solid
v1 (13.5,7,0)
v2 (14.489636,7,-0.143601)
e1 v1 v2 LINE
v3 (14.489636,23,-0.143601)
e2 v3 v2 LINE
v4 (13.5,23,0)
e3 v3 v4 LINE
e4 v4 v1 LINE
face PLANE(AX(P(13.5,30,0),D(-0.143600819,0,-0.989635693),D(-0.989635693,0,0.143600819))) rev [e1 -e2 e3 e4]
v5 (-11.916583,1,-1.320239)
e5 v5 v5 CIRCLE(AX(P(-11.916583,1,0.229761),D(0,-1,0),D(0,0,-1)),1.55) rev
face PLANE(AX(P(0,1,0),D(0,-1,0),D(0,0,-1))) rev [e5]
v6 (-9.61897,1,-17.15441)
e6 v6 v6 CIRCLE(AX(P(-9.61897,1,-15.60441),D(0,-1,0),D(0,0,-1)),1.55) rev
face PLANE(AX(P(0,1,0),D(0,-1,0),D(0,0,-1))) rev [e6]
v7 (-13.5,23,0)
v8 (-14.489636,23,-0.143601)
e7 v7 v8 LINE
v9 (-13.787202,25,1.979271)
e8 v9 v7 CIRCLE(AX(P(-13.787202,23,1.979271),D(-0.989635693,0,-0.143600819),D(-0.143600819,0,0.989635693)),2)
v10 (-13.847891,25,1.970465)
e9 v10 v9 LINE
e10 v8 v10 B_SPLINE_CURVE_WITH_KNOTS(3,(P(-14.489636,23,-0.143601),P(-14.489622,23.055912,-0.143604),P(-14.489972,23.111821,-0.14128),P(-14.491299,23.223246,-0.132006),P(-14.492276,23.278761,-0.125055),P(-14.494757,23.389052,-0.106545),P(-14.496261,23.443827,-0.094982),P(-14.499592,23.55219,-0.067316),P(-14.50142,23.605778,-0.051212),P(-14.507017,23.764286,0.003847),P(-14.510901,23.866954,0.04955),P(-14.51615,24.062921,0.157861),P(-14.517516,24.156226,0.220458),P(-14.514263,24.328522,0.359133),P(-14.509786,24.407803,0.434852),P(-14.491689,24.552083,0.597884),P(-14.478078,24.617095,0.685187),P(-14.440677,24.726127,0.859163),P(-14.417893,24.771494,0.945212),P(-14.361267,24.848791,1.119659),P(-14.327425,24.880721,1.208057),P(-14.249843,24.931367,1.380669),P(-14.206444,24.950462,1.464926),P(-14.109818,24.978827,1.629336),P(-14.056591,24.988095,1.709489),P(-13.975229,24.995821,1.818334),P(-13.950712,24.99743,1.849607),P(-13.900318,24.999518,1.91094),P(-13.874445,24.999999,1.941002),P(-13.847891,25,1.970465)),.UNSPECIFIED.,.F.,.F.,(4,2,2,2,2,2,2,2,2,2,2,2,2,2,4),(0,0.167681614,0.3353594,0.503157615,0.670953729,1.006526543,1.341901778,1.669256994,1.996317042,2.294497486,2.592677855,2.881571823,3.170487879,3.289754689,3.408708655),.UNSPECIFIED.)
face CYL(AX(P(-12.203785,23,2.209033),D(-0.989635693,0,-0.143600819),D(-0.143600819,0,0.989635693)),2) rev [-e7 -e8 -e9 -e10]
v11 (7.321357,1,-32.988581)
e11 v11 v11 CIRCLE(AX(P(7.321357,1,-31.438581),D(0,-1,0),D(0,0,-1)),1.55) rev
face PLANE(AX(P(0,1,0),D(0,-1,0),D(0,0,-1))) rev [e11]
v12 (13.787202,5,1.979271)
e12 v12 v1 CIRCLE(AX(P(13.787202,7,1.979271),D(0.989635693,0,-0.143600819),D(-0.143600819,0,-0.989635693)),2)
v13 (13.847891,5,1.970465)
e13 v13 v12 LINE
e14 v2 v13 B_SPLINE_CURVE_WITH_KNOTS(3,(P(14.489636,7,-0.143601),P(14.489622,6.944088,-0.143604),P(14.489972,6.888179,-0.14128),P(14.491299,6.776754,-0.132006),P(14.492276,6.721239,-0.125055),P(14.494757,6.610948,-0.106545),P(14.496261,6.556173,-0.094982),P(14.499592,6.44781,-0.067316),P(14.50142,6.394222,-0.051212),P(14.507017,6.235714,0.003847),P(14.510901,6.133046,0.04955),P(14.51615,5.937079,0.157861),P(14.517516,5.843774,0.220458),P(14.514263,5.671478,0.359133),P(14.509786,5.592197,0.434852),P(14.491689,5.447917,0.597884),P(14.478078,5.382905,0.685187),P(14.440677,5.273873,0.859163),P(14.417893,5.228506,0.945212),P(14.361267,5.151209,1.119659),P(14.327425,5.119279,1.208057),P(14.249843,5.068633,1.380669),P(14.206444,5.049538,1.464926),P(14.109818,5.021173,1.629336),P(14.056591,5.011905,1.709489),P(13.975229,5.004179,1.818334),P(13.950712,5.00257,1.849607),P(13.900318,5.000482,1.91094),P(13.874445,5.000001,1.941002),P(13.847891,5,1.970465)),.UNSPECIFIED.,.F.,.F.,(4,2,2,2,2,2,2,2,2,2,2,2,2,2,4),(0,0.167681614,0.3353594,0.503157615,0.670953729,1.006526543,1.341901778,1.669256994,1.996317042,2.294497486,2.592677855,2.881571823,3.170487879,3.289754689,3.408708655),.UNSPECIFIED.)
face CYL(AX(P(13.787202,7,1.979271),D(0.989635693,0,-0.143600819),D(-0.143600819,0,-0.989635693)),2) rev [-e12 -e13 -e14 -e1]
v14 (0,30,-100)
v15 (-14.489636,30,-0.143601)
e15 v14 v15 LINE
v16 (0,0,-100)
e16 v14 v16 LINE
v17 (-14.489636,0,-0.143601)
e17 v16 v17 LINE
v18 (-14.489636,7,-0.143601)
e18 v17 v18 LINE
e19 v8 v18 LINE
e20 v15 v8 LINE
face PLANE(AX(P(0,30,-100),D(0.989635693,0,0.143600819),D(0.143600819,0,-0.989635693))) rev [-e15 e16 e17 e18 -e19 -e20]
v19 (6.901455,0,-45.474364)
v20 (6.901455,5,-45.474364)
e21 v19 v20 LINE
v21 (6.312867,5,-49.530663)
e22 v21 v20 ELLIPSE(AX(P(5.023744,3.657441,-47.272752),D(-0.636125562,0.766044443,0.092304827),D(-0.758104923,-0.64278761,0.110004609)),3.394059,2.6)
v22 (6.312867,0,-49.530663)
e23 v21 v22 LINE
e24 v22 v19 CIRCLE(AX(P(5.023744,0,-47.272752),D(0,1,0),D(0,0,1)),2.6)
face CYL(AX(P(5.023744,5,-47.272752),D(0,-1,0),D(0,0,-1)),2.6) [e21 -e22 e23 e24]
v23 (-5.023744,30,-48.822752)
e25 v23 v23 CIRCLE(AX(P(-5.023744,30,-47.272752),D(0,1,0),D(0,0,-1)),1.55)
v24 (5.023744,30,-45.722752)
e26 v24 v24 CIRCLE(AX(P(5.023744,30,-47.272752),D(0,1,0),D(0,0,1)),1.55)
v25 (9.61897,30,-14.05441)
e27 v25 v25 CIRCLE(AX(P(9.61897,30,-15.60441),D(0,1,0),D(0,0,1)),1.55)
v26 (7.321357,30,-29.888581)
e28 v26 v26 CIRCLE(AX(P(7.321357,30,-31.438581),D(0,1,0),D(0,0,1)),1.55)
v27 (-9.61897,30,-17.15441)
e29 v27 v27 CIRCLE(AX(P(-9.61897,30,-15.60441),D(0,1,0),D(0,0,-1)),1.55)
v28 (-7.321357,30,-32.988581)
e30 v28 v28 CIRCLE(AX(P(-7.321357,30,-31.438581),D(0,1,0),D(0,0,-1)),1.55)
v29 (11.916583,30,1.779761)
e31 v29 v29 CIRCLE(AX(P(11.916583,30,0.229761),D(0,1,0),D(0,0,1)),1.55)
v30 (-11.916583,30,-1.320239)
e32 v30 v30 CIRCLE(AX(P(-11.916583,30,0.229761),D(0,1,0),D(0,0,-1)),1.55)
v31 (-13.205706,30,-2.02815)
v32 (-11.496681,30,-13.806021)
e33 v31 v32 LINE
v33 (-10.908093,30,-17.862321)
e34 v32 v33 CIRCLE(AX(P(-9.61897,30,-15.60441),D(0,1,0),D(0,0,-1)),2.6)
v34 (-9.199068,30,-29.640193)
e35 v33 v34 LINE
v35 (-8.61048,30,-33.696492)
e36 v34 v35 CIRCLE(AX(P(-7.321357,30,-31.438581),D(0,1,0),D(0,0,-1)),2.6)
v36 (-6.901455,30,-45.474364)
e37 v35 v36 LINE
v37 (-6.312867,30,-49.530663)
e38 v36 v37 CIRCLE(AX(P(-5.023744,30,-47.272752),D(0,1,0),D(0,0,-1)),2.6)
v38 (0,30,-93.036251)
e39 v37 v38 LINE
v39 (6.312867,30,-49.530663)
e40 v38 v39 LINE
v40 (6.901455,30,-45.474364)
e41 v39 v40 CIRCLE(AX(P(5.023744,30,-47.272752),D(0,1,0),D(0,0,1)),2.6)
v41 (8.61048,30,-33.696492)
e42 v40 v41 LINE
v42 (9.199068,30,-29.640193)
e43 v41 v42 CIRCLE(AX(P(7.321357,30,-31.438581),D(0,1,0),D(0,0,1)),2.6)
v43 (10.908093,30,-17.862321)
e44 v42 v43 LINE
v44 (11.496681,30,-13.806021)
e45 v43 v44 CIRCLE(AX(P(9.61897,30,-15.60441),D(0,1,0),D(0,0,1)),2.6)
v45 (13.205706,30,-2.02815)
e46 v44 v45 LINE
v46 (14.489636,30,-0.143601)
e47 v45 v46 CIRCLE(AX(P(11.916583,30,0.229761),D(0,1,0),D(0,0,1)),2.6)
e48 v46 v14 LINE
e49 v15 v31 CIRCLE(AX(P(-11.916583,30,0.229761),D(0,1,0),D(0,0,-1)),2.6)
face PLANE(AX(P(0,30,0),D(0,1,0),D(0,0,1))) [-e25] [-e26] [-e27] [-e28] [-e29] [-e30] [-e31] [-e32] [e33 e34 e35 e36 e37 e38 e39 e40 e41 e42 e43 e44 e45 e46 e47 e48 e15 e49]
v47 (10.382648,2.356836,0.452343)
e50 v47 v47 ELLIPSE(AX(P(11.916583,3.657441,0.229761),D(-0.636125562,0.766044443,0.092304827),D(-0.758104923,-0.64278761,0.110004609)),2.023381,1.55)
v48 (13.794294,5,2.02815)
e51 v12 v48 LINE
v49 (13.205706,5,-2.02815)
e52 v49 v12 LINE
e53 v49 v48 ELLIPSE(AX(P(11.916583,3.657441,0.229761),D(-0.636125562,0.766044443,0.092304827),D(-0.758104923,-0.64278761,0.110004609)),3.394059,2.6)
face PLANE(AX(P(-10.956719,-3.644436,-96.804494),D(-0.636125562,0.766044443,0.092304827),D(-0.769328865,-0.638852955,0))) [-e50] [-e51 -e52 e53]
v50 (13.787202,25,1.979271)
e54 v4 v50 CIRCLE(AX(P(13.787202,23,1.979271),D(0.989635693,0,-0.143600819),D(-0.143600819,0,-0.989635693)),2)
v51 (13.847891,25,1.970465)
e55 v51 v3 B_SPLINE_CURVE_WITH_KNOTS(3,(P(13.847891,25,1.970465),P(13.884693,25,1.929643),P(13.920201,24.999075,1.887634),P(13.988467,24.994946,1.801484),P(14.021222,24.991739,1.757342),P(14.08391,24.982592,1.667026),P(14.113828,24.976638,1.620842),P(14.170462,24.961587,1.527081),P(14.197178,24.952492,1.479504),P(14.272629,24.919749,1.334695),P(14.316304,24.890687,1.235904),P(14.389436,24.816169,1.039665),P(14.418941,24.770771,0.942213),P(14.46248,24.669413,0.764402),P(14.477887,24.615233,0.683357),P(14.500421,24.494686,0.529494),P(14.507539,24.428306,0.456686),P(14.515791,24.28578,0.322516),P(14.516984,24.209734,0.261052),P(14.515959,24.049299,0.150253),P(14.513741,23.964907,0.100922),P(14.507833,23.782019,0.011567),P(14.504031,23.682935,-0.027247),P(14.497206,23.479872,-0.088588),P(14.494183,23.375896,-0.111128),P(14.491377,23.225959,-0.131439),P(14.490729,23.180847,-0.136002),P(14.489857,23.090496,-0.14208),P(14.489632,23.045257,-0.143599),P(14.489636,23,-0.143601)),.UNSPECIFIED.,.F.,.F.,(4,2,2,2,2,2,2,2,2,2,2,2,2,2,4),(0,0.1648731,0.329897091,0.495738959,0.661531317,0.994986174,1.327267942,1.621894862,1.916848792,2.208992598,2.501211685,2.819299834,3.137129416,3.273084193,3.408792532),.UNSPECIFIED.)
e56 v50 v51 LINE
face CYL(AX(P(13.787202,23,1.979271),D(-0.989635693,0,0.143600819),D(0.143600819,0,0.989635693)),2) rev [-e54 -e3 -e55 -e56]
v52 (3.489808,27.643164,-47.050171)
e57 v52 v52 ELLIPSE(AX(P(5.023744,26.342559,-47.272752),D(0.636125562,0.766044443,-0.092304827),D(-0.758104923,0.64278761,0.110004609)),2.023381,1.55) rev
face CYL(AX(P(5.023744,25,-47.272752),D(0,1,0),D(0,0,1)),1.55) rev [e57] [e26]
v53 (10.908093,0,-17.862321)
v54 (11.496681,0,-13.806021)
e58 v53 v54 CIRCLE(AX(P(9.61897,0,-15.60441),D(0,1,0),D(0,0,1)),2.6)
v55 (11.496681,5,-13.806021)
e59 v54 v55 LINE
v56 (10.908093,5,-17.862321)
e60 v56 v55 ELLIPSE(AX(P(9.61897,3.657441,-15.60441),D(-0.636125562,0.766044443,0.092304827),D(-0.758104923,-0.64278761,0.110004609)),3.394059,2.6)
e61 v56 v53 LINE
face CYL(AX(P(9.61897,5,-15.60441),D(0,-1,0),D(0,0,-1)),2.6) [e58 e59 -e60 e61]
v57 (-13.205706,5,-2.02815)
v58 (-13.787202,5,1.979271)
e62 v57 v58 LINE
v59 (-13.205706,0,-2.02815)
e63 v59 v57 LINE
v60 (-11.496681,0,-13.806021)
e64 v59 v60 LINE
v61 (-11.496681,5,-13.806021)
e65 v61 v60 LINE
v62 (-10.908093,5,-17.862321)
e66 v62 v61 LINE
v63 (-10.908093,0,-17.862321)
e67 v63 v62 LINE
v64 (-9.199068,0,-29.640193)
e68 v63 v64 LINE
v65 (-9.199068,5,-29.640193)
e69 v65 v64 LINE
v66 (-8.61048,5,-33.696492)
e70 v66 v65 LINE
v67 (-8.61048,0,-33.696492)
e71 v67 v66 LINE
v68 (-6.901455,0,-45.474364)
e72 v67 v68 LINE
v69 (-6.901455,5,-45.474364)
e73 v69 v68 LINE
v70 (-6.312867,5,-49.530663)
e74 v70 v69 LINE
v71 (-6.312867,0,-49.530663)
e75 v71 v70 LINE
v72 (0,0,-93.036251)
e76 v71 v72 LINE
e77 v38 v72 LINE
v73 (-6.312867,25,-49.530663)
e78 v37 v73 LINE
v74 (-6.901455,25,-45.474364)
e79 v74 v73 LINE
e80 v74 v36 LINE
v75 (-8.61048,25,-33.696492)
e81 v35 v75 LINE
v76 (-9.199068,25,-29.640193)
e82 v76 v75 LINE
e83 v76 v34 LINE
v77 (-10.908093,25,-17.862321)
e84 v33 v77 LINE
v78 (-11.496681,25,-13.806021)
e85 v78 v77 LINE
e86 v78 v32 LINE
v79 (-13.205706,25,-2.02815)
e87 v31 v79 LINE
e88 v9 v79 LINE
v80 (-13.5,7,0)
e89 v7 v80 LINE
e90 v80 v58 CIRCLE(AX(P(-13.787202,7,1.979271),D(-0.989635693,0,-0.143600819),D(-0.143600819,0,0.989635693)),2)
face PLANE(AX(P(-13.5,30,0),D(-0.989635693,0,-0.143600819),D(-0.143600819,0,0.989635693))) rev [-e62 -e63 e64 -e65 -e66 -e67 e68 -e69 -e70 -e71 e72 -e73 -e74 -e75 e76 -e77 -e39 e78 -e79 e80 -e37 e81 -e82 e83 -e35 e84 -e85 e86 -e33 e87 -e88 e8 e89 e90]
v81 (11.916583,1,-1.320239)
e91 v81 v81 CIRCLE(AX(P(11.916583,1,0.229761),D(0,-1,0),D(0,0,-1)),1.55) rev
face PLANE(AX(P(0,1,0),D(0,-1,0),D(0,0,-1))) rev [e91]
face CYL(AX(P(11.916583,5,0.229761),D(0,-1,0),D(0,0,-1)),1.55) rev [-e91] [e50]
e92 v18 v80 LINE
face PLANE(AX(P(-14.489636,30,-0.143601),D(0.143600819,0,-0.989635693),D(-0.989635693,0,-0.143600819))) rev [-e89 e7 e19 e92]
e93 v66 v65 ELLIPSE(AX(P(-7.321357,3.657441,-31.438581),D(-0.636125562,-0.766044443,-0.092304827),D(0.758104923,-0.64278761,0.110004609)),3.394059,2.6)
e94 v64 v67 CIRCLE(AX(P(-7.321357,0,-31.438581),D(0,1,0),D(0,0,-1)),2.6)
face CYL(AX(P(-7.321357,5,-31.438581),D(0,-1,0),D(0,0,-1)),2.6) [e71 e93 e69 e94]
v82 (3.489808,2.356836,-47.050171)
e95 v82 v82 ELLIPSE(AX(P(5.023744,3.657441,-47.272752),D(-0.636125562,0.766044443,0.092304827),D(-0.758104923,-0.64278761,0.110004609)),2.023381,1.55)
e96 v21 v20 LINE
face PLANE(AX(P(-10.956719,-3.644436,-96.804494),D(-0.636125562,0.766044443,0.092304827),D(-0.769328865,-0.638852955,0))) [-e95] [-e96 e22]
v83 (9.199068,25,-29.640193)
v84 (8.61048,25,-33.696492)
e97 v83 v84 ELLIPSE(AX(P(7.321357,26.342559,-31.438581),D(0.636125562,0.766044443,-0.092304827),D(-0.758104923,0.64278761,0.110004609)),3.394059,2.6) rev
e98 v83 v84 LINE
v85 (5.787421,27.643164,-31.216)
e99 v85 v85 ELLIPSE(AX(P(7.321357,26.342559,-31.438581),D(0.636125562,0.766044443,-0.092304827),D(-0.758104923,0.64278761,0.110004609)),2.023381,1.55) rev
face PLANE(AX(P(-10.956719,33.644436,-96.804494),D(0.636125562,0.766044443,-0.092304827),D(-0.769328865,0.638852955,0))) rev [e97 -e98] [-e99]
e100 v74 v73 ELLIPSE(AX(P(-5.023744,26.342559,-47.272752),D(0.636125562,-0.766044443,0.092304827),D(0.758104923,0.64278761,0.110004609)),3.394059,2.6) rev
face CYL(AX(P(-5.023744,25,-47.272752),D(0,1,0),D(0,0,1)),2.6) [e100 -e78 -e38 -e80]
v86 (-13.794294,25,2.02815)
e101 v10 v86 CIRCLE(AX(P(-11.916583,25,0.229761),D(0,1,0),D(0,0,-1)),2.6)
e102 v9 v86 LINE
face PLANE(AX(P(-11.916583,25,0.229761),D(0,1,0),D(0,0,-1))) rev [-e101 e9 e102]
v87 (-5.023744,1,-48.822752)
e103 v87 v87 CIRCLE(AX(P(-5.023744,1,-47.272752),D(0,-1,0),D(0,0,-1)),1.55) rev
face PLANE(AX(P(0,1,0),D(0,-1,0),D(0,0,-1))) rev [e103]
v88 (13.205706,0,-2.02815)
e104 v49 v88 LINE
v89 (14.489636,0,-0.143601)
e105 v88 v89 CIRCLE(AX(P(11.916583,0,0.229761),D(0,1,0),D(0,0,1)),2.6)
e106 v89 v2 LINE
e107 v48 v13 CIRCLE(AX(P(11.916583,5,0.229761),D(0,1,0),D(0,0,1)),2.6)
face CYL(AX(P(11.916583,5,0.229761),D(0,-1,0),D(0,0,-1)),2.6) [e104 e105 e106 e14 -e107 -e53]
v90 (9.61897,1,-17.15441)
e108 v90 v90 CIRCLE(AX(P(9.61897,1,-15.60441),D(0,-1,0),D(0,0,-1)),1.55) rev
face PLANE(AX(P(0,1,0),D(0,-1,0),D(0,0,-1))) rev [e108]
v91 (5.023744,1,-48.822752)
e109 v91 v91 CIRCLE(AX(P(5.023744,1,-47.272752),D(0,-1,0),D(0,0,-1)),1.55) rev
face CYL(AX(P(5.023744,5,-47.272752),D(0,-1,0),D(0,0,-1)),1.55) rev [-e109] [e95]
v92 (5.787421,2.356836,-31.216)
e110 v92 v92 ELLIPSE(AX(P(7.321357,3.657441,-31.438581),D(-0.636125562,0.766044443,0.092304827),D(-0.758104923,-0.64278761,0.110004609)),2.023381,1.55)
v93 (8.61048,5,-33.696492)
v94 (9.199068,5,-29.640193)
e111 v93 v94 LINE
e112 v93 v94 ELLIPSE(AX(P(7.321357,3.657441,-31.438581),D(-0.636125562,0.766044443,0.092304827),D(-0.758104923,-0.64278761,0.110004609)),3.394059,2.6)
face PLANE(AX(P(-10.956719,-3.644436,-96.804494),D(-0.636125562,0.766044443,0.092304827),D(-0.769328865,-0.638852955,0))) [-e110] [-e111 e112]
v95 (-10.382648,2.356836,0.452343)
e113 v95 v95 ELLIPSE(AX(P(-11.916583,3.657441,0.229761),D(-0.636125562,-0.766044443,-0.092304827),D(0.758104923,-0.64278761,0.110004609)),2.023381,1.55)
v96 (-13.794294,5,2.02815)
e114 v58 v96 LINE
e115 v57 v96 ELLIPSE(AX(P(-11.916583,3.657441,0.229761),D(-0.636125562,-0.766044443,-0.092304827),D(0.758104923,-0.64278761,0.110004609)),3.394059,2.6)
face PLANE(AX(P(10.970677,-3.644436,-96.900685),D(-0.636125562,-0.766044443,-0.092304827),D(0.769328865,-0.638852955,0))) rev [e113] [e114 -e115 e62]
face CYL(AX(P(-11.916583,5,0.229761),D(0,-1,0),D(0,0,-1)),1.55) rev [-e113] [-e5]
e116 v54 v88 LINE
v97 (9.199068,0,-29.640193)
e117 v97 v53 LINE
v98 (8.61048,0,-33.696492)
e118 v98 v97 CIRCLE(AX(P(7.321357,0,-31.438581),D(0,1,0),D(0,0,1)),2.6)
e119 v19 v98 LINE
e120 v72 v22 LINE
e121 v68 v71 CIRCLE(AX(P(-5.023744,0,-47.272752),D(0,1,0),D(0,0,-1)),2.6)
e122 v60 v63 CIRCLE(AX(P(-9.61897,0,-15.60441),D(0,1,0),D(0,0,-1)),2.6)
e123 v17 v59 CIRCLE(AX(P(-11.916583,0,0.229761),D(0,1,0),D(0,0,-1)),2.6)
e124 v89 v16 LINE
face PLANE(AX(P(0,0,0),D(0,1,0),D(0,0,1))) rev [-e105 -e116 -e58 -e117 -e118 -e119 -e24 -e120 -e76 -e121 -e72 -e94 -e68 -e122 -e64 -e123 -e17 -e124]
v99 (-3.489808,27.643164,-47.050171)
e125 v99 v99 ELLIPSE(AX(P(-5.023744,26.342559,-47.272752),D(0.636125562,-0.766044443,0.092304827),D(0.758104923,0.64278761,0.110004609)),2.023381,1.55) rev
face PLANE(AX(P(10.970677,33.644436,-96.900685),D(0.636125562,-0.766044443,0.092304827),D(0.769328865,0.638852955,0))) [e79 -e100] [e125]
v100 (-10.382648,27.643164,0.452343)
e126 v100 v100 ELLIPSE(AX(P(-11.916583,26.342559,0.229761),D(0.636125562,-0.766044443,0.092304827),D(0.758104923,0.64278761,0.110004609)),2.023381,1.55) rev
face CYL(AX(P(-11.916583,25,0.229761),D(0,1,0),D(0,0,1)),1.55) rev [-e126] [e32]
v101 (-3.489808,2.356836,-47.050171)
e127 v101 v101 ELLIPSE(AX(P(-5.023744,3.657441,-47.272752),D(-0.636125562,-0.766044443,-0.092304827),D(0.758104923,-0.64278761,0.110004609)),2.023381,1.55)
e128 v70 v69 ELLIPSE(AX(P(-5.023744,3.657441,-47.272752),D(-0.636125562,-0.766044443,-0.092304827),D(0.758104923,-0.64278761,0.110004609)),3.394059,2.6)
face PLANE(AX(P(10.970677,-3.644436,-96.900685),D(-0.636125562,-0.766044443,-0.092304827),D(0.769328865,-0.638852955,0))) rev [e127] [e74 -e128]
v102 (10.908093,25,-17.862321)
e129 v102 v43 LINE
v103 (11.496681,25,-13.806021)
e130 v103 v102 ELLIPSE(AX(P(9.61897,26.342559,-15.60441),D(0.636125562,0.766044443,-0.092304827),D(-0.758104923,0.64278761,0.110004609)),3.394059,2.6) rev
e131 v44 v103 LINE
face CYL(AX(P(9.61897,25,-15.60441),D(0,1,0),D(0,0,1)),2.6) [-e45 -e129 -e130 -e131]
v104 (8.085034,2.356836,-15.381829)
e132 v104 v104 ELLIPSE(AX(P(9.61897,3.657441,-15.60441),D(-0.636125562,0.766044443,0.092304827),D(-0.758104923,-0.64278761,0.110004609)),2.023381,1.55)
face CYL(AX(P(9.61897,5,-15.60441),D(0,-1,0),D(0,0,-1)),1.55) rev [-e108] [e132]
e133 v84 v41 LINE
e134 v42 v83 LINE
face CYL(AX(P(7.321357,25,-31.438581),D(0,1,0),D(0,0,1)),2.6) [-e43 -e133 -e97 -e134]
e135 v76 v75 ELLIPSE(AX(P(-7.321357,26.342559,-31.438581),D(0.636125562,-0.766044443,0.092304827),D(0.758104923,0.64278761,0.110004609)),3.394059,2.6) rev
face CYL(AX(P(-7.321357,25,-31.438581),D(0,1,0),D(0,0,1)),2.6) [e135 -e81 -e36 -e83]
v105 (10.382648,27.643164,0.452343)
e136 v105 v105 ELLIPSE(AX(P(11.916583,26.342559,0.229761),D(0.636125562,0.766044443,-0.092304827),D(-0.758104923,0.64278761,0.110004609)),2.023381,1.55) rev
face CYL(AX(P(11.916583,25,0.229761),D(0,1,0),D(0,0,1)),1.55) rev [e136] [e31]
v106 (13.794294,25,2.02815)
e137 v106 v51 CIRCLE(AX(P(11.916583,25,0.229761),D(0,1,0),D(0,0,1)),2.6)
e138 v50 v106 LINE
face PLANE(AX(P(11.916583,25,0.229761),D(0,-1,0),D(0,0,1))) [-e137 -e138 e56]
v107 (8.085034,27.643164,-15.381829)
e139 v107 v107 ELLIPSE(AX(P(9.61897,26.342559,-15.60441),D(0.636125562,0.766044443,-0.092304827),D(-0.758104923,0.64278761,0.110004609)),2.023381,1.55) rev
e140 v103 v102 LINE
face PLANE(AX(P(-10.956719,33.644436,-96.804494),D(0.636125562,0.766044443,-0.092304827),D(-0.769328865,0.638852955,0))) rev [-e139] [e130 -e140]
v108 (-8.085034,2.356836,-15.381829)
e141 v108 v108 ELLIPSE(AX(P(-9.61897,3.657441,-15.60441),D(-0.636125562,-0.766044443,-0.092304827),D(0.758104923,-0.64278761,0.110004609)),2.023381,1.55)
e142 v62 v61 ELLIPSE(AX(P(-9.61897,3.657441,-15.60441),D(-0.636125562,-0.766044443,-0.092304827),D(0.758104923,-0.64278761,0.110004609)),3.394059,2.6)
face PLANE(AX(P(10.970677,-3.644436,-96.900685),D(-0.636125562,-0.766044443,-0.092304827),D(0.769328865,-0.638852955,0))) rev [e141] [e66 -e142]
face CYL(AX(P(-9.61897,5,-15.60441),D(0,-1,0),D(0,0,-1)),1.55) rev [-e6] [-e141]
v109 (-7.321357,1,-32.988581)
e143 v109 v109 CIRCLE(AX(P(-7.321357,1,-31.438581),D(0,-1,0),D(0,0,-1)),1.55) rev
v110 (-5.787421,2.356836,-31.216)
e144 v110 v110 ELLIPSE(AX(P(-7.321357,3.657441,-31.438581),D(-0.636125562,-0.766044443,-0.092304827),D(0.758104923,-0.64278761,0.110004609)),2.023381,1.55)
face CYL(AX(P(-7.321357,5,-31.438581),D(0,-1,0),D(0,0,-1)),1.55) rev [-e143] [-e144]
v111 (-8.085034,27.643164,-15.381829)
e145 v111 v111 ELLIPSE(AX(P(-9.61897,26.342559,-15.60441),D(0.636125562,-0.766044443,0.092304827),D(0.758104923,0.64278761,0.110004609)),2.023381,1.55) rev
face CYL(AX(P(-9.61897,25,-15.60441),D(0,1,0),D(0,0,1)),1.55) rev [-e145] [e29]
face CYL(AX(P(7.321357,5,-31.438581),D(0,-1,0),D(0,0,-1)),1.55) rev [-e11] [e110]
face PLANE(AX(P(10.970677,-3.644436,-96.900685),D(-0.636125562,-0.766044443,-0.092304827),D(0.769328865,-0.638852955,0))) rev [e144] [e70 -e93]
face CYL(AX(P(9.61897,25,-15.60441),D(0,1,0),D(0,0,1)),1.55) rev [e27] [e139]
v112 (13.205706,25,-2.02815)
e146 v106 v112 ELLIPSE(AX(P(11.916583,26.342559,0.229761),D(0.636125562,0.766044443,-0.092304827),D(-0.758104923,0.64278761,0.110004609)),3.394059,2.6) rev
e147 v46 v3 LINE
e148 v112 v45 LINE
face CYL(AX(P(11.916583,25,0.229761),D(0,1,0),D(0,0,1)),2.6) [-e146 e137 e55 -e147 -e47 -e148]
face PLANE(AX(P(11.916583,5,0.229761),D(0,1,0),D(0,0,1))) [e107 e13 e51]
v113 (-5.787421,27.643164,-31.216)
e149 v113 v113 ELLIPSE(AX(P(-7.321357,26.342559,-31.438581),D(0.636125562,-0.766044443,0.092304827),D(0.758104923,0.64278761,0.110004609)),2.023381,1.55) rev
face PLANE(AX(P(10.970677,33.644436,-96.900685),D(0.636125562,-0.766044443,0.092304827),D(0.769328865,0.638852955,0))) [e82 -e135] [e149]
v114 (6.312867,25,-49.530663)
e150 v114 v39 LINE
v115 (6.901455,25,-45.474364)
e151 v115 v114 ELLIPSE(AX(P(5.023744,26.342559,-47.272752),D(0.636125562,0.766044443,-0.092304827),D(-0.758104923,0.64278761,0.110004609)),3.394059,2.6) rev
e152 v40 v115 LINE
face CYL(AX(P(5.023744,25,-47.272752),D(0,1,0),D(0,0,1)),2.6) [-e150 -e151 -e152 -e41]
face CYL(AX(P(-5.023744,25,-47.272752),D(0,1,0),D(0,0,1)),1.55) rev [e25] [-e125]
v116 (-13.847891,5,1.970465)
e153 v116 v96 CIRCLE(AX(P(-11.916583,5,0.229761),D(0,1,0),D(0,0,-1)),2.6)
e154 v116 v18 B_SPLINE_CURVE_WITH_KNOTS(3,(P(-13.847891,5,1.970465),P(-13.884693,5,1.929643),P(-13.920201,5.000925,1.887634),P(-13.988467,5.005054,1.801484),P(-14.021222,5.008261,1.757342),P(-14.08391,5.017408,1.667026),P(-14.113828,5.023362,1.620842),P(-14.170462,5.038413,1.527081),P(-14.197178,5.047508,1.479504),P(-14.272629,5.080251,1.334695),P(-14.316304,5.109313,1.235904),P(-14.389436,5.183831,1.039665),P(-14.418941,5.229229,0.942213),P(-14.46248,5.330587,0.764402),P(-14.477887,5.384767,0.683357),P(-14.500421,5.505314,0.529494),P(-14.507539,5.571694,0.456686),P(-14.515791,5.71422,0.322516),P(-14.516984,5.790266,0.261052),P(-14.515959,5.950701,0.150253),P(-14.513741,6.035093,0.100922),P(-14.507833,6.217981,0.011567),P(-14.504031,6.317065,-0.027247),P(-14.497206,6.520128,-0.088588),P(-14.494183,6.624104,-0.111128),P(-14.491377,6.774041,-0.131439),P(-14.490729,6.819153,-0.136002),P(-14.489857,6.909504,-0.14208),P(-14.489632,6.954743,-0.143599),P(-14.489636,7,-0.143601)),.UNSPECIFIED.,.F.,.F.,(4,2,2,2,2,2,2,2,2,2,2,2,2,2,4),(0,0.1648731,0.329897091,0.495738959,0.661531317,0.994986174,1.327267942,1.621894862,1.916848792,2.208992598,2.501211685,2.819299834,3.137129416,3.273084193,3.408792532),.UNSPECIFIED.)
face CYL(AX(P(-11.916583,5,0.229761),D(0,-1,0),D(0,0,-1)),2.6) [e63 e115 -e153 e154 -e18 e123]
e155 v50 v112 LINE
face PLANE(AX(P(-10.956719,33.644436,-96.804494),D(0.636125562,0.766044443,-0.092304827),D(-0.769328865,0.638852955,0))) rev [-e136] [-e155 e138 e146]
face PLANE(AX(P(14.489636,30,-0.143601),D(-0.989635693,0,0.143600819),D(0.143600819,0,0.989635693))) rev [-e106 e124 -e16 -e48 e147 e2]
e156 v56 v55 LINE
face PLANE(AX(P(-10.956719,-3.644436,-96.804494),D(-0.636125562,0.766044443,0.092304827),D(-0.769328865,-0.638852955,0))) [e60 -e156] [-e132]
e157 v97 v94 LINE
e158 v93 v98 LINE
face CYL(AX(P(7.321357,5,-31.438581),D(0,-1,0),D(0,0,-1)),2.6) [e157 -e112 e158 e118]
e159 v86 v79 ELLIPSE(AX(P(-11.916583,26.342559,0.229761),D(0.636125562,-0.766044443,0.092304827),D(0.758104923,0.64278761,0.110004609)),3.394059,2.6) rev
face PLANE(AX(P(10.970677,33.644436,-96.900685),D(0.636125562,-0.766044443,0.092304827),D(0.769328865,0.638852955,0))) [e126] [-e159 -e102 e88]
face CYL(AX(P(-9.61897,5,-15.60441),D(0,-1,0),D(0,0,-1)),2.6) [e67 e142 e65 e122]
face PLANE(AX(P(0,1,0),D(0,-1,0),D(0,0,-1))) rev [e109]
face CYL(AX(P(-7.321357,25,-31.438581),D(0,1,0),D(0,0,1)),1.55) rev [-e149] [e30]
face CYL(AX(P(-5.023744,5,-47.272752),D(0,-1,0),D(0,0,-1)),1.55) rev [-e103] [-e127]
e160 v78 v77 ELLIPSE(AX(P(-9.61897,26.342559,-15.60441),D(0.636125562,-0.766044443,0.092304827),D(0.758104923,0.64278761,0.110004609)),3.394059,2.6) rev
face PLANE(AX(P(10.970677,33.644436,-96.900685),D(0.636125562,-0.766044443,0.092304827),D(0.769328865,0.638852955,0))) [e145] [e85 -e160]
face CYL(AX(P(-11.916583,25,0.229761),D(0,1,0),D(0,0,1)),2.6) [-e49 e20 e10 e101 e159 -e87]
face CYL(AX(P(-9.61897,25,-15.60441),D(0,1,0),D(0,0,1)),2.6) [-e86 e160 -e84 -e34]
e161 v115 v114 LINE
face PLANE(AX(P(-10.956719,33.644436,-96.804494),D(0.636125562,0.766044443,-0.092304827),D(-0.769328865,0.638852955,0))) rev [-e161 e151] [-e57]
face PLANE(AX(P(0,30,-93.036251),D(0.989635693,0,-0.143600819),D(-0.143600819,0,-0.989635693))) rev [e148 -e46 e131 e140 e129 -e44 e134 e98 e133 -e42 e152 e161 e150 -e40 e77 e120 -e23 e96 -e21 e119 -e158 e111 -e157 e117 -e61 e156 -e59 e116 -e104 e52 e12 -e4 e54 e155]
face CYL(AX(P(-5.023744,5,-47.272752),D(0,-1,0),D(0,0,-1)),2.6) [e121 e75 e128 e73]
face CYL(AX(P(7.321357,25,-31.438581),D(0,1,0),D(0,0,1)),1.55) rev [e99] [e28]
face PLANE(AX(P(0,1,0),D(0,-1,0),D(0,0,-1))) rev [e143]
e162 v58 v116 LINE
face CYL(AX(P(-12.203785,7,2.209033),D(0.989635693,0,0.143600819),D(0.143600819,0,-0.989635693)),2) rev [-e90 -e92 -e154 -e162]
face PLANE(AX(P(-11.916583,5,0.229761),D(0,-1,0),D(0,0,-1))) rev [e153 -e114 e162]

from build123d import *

# Parameters (mm, degrees)
BOSS_EXTRUDE1_DEPTH            = 30
SKETCH2_R                      = 2.6
SKETCH2_R_2                    = 1.55
BOSS_EXTRUDE3_DEPTH            = 5
CUT_EXTRUDE1_REACH             = 109.267
CUT_EXTRUDE1_DIRECTION_2_DEPTH = 108.267308909
CUT_EXTRUDE2_REACH             = 109.267
CUT_EXTRUDE2_DIRECTION_2_DEPTH = 108.267308909
FILLET1_R                      = 2
SKETCH6_R                      = 2.6
BOSS_EXTRUDE4_DEPTH            = 1


with BuildPart() as part:
    # Sketch1 → Boss-Extrude1 (new body)
    with BuildSketch(Plane(origin=(0, 0, 0), x_dir=(1, 0, 0), z_dir=(0, 1, 0))):
        Polygon((-13.5, 0), (0, 93.036251394), (13.5, 0), (14.489635693, 0.143600819), (0, 100), (-14.489635693, 0.143600819), align=None)
    extrude(amount=BOSS_EXTRUDE1_DEPTH)

    # Sketch2 → Boss-Extrude3 (add)
    # profile 1 of 8: a face of its own
    with BuildSketch(Plane(origin=(0, 0, 0), x_dir=(1, 0, 0), z_dir=(0, 1, 0))):
        with Locations((11.916582891, -0.22976131)):
            Circle(SKETCH2_R)
        with Locations(Location((11.916582891, -0.22976131, 0), (0, 0, 270))):
            Circle(SKETCH2_R_2, mode=Mode.SUBTRACT)
    # profile 2 of 8: a face of its own
    with BuildSketch(Plane(origin=(0, 0, 0), x_dir=(1, 0, 0), z_dir=(0, 1, 0))):
        with Locations((9.618969794, 15.604409779)):
            Circle(SKETCH2_R)
        with Locations(Location((9.618969794, 15.604409779, 0), (0, 0, 270))):
            Circle(SKETCH2_R_2, mode=Mode.SUBTRACT)
    # profile 3 of 8: a face of its own
    with BuildSketch(Plane(origin=(0, 0, 0), x_dir=(1, 0, 0), z_dir=(0, 1, 0))):
        with Locations((7.321356697, 31.438580867)):
            Circle(SKETCH2_R)
        with Locations(Location((7.321356697, 31.438580867, 0), (0, 0, 270))):
            Circle(SKETCH2_R_2, mode=Mode.SUBTRACT)
    # profile 4 of 8: a face of its own
    with BuildSketch(Plane(origin=(0, 0, 0), x_dir=(1, 0, 0), z_dir=(0, 1, 0))):
        with Locations((5.0237436, 47.272751956)):
            Circle(SKETCH2_R)
        with Locations(Location((5.0237436, 47.272751956, 0), (0, 0, 270))):
            Circle(SKETCH2_R_2, mode=Mode.SUBTRACT)
    # profile 5 of 8: a face of its own
    with BuildSketch(Plane(origin=(0, 0, 0), x_dir=(1, 0, 0), z_dir=(0, 1, 0))):
        with Locations((-11.916582891, -0.22976131)):
            Circle(SKETCH2_R)
        with Locations(Location((-11.916582891, -0.22976131, 0), (0, 0, 90))):
            Circle(SKETCH2_R_2, mode=Mode.SUBTRACT)
    # profile 6 of 8: a face of its own
    with BuildSketch(Plane(origin=(0, 0, 0), x_dir=(1, 0, 0), z_dir=(0, 1, 0))):
        with Locations((-9.618969794, 15.604409779)):
            Circle(SKETCH2_R)
        with Locations(Location((-9.618969794, 15.604409779, 0), (0, 0, 90))):
            Circle(SKETCH2_R_2, mode=Mode.SUBTRACT)
    # profile 7 of 8: a face of its own
    with BuildSketch(Plane(origin=(0, 0, 0), x_dir=(1, 0, 0), z_dir=(0, 1, 0))):
        with Locations((-7.321356697, 31.438580867)):
            Circle(SKETCH2_R)
        with Locations(Location((-7.321356697, 31.438580867, 0), (0, 0, 90))):
            Circle(SKETCH2_R_2, mode=Mode.SUBTRACT)
    # profile 8 of 8: a face of its own
    with BuildSketch(Plane(origin=(0, 0, 0), x_dir=(1, 0, 0), z_dir=(0, 1, 0))):
        with Locations((-5.0237436, 47.272751956)):
            Circle(SKETCH2_R)
        with Locations(Location((-5.0237436, 47.272751956, 0), (0, 0, 90))):
            Circle(SKETCH2_R_2, mode=Mode.SUBTRACT)
    boss_extrude3 = extrude(amount=BOSS_EXTRUDE3_DEPTH)

    # Cut-Extrude1: up to this face of the body (flat: up to its plane)
    cut_extrude1_end = Plane(part.part.faces().sort_by_distance((-6.677185099, 15.326206653, -47.019934992))[0])
    # Sketch4 → Cut-Extrude1 (cut, up to the picked face)
    with BuildSketch(Plane(origin=(0.278386134, 0, 1.918518691), x_dir=(0.9896356930251445, 0, -0.14360081855839762), z_dir=(0.14360081855839762, 0, 0.9896356930251445)), mode=Mode.PRIVATE) as cut_extrude1_sk1:
        Polygon((13.360081856, 5), (9.160081856, 5), (9.160081856, 1.475781549), align=None)
    cut_extrude1_tool1 = split(extrude(cut_extrude1_sk1.sketch, amount=-CUT_EXTRUDE1_REACH, mode=Mode.PRIVATE), bisect_by=cut_extrude1_end, keep=Keep.BOTH, mode=Mode.PRIVATE)
    cut_extrude1 = cut_extrude1_tool1.solids().sort_by(Axis((10.72902, 3.825261, 0.402082), (-0.14360081855839762, 0, -0.9896356930251445)))[0]
    add(cut_extrude1, mode=Mode.SUBTRACT)

    # Sketch4 → Cut-Extrude1 direction 2 (cut)
    with BuildSketch(Plane(origin=(0.278386134, 0, 1.918518691), x_dir=(0.9896356930251445, 0, -0.14360081855839762), z_dir=(0.14360081855839762, 0, 0.9896356930251445))):
        Polygon((13.360081856, 5), (9.160081856, 5), (9.160081856, 1.475781549), align=None)
    cut_extrude1_direction_2 = extrude(amount=CUT_EXTRUDE1_DIRECTION_2_DEPTH, mode=Mode.SUBTRACT)

    # Cut-Extrude2: up to this face of the body (flat: up to its plane)
    cut_extrude2_end = Plane(part.part.faces().sort_by_distance((6.677185099, 15.326206653, -47.019934992))[0])
    # Sketch5 → Cut-Extrude2 (cut, up to the picked face)
    with BuildSketch(Plane(origin=(-0.278386134, 0, 1.918518691), x_dir=(0.9896356930251446, 0, 0.14360081855839799), z_dir=(-0.14360081855839799, 0, 0.9896356930251446)), mode=Mode.PRIVATE) as cut_extrude2_sk1:
        Polygon((-9.083094078, 5), (-9.083094078, 1.411181133), (-13.360081856, 5), align=None)
    cut_extrude2_tool1 = split(extrude(cut_extrude2_sk1.sketch, amount=-CUT_EXTRUDE2_REACH, mode=Mode.PRIVATE), bisect_by=cut_extrude2_end, keep=Keep.BOTH, mode=Mode.PRIVATE)
    cut_extrude2 = cut_extrude2_tool1.solids().sort_by(Axis((-10.678227, 3.803727, 0.409453), (0.14360081855839799, 0, -0.9896356930251446)))[0]
    add(cut_extrude2, mode=Mode.SUBTRACT)

    # Sketch5 → Cut-Extrude2 direction 2 (cut)
    with BuildSketch(Plane(origin=(-0.278386134, 0, 1.918518691), x_dir=(0.9896356930251446, 0, 0.14360081855839799), z_dir=(-0.14360081855839799, 0, 0.9896356930251446))):
        Polygon((-9.083094078, 5), (-9.083094078, 1.411181133), (-13.360081856, 5), align=None)
    cut_extrude2_direction_2 = extrude(amount=CUT_EXTRUDE2_DIRECTION_2_DEPTH, mode=Mode.SUBTRACT)

    # Mirror2: Boss-Extrude3, Cut-Extrude1, Cut-Extrude1 direction 2, Cut-Extrude2, Cut-Extrude2 direction 2 across plane
    add(boss_extrude3.mirror(Plane.ZX.offset(15)))
    add(cut_extrude1.mirror(Plane.ZX.offset(15)), mode=Mode.SUBTRACT)
    add(cut_extrude1_direction_2.mirror(Plane.ZX.offset(15)), mode=Mode.SUBTRACT)
    add(cut_extrude2.mirror(Plane.ZX.offset(15)), mode=Mode.SUBTRACT)
    add(cut_extrude2_direction_2.mirror(Plane.ZX.offset(15)), mode=Mode.SUBTRACT)

    # Fillet1
    # the kernel refuses this fillet: 2 mm, written as the material it adds along each edge
    with BuildSketch(Plane(origin=(13.5, 25, 0), x_dir=(0, -1, 0), z_dir=(0.9896356930251446, 0, -0.14360081855839765))) as fillet1_piece_1_section:
        with BuildLine():
            CenterArc((FILLET1_R, -FILLET1_R), FILLET1_R, 90, 90)
            Line((0, -FILLET1_R), (0, 0))
            Line((0, 0), (FILLET1_R, 0))
        make_face()
    fillet1_piece_1 = extrude(amount=6, mode=Mode.PRIVATE)
    fillet1_piece_1 = fillet1_piece_1 & Plane(origin=(11.916582891, 24.30002226, 0.22976131), x_dir=(1, 0, 0), z_dir=(0, 1, 0)) * Cylinder(2.6, 21, mode=Mode.PRIVATE)
    add(fillet1_piece_1)
    with BuildSketch(Plane(origin=(-19.437814158, 25, -0.861604911), x_dir=(0, -1, 0), z_dir=(0.9896356930251445, 0, 0.143600818558398))) as fillet1_piece_2_section:
        with BuildLine():
            CenterArc((FILLET1_R, -FILLET1_R), FILLET1_R, 90, 90)
            Line((0, -FILLET1_R), (0, 0))
            Line((0, 0), (FILLET1_R, 0))
        make_face()
    fillet1_piece_2 = extrude(amount=6, mode=Mode.PRIVATE)
    fillet1_piece_2 = fillet1_piece_2 & Plane(origin=(-11.916582891, 24.777637105, 0.22976131), x_dir=(1, 0, 0), z_dir=(0, 1, 0)) * Cylinder(2.6, 21, mode=Mode.PRIVATE)
    add(fillet1_piece_2)
    with BuildSketch(Plane(origin=(13.5, 5, 0), x_dir=(0, 1, 0), z_dir=(0.9896356930251446, 0, -0.14360081855839765))) as fillet1_piece_3_section:
        with BuildLine():
            CenterArc((FILLET1_R, FILLET1_R), FILLET1_R, 180, 90)
            Line((0, FILLET1_R), (0, 0))
            Line((0, 0), (FILLET1_R, 0))
        make_face()
    fillet1_piece_3 = extrude(amount=6, mode=Mode.PRIVATE)
    fillet1_piece_3 = fillet1_piece_3 & Plane(origin=(11.916582891, 5.699977741, 0.22976131), x_dir=(1, 0, 0), z_dir=(0, -1, 0)) * Cylinder(2.6, 21, mode=Mode.PRIVATE)
    add(fillet1_piece_3)
    with BuildSketch(Plane(origin=(-19.437814158, 5, -0.861604911), x_dir=(-0.143600818558398, 0, 0.9896356930251445), z_dir=(0.9896356930251445, 0, 0.143600818558398))) as fillet1_piece_4_section:
        with BuildLine():
            CenterArc((FILLET1_R, -FILLET1_R), FILLET1_R, 90, 90)
            Line((0, -FILLET1_R), (0, 0))
            Line((0, 0), (FILLET1_R, 0))
        make_face()
    fillet1_piece_4 = extrude(amount=6, mode=Mode.PRIVATE)
    fillet1_piece_4 = fillet1_piece_4 & Plane(origin=(-11.916582891, 5.222362792, 0.22976131), x_dir=(1, 0, 0), z_dir=(0, -1, 0)) * Cylinder(2.6, 21, mode=Mode.PRIVATE)
    add(fillet1_piece_4)

    # Sketch6 → Boss-Extrude4 (add)
    with BuildSketch(Plane.XZ):
        with Locations((-9.618969794, -15.604409779)):
            Circle(SKETCH6_R)
        with Locations((9.618969794, -15.604409779)):
            Circle(SKETCH6_R)
        with Locations((7.321356697, -31.438580867)):
            Circle(SKETCH6_R)
        with Locations((-7.321356697, -31.438580867)):
            Circle(SKETCH6_R)
        with Locations((-5.0237436, -47.272751956)):
            Circle(SKETCH6_R)
        with Locations((5.0237436, -47.272751956)):
            Circle(SKETCH6_R)
        with Locations((11.916582891, 0.22976131)):
            Circle(SKETCH6_R)
        with Locations((-11.916582891, 0.22976131)):
            Circle(SKETCH6_R)
    extrude(amount=-BOSS_EXTRUDE4_DEPTH)


solid = part.part
